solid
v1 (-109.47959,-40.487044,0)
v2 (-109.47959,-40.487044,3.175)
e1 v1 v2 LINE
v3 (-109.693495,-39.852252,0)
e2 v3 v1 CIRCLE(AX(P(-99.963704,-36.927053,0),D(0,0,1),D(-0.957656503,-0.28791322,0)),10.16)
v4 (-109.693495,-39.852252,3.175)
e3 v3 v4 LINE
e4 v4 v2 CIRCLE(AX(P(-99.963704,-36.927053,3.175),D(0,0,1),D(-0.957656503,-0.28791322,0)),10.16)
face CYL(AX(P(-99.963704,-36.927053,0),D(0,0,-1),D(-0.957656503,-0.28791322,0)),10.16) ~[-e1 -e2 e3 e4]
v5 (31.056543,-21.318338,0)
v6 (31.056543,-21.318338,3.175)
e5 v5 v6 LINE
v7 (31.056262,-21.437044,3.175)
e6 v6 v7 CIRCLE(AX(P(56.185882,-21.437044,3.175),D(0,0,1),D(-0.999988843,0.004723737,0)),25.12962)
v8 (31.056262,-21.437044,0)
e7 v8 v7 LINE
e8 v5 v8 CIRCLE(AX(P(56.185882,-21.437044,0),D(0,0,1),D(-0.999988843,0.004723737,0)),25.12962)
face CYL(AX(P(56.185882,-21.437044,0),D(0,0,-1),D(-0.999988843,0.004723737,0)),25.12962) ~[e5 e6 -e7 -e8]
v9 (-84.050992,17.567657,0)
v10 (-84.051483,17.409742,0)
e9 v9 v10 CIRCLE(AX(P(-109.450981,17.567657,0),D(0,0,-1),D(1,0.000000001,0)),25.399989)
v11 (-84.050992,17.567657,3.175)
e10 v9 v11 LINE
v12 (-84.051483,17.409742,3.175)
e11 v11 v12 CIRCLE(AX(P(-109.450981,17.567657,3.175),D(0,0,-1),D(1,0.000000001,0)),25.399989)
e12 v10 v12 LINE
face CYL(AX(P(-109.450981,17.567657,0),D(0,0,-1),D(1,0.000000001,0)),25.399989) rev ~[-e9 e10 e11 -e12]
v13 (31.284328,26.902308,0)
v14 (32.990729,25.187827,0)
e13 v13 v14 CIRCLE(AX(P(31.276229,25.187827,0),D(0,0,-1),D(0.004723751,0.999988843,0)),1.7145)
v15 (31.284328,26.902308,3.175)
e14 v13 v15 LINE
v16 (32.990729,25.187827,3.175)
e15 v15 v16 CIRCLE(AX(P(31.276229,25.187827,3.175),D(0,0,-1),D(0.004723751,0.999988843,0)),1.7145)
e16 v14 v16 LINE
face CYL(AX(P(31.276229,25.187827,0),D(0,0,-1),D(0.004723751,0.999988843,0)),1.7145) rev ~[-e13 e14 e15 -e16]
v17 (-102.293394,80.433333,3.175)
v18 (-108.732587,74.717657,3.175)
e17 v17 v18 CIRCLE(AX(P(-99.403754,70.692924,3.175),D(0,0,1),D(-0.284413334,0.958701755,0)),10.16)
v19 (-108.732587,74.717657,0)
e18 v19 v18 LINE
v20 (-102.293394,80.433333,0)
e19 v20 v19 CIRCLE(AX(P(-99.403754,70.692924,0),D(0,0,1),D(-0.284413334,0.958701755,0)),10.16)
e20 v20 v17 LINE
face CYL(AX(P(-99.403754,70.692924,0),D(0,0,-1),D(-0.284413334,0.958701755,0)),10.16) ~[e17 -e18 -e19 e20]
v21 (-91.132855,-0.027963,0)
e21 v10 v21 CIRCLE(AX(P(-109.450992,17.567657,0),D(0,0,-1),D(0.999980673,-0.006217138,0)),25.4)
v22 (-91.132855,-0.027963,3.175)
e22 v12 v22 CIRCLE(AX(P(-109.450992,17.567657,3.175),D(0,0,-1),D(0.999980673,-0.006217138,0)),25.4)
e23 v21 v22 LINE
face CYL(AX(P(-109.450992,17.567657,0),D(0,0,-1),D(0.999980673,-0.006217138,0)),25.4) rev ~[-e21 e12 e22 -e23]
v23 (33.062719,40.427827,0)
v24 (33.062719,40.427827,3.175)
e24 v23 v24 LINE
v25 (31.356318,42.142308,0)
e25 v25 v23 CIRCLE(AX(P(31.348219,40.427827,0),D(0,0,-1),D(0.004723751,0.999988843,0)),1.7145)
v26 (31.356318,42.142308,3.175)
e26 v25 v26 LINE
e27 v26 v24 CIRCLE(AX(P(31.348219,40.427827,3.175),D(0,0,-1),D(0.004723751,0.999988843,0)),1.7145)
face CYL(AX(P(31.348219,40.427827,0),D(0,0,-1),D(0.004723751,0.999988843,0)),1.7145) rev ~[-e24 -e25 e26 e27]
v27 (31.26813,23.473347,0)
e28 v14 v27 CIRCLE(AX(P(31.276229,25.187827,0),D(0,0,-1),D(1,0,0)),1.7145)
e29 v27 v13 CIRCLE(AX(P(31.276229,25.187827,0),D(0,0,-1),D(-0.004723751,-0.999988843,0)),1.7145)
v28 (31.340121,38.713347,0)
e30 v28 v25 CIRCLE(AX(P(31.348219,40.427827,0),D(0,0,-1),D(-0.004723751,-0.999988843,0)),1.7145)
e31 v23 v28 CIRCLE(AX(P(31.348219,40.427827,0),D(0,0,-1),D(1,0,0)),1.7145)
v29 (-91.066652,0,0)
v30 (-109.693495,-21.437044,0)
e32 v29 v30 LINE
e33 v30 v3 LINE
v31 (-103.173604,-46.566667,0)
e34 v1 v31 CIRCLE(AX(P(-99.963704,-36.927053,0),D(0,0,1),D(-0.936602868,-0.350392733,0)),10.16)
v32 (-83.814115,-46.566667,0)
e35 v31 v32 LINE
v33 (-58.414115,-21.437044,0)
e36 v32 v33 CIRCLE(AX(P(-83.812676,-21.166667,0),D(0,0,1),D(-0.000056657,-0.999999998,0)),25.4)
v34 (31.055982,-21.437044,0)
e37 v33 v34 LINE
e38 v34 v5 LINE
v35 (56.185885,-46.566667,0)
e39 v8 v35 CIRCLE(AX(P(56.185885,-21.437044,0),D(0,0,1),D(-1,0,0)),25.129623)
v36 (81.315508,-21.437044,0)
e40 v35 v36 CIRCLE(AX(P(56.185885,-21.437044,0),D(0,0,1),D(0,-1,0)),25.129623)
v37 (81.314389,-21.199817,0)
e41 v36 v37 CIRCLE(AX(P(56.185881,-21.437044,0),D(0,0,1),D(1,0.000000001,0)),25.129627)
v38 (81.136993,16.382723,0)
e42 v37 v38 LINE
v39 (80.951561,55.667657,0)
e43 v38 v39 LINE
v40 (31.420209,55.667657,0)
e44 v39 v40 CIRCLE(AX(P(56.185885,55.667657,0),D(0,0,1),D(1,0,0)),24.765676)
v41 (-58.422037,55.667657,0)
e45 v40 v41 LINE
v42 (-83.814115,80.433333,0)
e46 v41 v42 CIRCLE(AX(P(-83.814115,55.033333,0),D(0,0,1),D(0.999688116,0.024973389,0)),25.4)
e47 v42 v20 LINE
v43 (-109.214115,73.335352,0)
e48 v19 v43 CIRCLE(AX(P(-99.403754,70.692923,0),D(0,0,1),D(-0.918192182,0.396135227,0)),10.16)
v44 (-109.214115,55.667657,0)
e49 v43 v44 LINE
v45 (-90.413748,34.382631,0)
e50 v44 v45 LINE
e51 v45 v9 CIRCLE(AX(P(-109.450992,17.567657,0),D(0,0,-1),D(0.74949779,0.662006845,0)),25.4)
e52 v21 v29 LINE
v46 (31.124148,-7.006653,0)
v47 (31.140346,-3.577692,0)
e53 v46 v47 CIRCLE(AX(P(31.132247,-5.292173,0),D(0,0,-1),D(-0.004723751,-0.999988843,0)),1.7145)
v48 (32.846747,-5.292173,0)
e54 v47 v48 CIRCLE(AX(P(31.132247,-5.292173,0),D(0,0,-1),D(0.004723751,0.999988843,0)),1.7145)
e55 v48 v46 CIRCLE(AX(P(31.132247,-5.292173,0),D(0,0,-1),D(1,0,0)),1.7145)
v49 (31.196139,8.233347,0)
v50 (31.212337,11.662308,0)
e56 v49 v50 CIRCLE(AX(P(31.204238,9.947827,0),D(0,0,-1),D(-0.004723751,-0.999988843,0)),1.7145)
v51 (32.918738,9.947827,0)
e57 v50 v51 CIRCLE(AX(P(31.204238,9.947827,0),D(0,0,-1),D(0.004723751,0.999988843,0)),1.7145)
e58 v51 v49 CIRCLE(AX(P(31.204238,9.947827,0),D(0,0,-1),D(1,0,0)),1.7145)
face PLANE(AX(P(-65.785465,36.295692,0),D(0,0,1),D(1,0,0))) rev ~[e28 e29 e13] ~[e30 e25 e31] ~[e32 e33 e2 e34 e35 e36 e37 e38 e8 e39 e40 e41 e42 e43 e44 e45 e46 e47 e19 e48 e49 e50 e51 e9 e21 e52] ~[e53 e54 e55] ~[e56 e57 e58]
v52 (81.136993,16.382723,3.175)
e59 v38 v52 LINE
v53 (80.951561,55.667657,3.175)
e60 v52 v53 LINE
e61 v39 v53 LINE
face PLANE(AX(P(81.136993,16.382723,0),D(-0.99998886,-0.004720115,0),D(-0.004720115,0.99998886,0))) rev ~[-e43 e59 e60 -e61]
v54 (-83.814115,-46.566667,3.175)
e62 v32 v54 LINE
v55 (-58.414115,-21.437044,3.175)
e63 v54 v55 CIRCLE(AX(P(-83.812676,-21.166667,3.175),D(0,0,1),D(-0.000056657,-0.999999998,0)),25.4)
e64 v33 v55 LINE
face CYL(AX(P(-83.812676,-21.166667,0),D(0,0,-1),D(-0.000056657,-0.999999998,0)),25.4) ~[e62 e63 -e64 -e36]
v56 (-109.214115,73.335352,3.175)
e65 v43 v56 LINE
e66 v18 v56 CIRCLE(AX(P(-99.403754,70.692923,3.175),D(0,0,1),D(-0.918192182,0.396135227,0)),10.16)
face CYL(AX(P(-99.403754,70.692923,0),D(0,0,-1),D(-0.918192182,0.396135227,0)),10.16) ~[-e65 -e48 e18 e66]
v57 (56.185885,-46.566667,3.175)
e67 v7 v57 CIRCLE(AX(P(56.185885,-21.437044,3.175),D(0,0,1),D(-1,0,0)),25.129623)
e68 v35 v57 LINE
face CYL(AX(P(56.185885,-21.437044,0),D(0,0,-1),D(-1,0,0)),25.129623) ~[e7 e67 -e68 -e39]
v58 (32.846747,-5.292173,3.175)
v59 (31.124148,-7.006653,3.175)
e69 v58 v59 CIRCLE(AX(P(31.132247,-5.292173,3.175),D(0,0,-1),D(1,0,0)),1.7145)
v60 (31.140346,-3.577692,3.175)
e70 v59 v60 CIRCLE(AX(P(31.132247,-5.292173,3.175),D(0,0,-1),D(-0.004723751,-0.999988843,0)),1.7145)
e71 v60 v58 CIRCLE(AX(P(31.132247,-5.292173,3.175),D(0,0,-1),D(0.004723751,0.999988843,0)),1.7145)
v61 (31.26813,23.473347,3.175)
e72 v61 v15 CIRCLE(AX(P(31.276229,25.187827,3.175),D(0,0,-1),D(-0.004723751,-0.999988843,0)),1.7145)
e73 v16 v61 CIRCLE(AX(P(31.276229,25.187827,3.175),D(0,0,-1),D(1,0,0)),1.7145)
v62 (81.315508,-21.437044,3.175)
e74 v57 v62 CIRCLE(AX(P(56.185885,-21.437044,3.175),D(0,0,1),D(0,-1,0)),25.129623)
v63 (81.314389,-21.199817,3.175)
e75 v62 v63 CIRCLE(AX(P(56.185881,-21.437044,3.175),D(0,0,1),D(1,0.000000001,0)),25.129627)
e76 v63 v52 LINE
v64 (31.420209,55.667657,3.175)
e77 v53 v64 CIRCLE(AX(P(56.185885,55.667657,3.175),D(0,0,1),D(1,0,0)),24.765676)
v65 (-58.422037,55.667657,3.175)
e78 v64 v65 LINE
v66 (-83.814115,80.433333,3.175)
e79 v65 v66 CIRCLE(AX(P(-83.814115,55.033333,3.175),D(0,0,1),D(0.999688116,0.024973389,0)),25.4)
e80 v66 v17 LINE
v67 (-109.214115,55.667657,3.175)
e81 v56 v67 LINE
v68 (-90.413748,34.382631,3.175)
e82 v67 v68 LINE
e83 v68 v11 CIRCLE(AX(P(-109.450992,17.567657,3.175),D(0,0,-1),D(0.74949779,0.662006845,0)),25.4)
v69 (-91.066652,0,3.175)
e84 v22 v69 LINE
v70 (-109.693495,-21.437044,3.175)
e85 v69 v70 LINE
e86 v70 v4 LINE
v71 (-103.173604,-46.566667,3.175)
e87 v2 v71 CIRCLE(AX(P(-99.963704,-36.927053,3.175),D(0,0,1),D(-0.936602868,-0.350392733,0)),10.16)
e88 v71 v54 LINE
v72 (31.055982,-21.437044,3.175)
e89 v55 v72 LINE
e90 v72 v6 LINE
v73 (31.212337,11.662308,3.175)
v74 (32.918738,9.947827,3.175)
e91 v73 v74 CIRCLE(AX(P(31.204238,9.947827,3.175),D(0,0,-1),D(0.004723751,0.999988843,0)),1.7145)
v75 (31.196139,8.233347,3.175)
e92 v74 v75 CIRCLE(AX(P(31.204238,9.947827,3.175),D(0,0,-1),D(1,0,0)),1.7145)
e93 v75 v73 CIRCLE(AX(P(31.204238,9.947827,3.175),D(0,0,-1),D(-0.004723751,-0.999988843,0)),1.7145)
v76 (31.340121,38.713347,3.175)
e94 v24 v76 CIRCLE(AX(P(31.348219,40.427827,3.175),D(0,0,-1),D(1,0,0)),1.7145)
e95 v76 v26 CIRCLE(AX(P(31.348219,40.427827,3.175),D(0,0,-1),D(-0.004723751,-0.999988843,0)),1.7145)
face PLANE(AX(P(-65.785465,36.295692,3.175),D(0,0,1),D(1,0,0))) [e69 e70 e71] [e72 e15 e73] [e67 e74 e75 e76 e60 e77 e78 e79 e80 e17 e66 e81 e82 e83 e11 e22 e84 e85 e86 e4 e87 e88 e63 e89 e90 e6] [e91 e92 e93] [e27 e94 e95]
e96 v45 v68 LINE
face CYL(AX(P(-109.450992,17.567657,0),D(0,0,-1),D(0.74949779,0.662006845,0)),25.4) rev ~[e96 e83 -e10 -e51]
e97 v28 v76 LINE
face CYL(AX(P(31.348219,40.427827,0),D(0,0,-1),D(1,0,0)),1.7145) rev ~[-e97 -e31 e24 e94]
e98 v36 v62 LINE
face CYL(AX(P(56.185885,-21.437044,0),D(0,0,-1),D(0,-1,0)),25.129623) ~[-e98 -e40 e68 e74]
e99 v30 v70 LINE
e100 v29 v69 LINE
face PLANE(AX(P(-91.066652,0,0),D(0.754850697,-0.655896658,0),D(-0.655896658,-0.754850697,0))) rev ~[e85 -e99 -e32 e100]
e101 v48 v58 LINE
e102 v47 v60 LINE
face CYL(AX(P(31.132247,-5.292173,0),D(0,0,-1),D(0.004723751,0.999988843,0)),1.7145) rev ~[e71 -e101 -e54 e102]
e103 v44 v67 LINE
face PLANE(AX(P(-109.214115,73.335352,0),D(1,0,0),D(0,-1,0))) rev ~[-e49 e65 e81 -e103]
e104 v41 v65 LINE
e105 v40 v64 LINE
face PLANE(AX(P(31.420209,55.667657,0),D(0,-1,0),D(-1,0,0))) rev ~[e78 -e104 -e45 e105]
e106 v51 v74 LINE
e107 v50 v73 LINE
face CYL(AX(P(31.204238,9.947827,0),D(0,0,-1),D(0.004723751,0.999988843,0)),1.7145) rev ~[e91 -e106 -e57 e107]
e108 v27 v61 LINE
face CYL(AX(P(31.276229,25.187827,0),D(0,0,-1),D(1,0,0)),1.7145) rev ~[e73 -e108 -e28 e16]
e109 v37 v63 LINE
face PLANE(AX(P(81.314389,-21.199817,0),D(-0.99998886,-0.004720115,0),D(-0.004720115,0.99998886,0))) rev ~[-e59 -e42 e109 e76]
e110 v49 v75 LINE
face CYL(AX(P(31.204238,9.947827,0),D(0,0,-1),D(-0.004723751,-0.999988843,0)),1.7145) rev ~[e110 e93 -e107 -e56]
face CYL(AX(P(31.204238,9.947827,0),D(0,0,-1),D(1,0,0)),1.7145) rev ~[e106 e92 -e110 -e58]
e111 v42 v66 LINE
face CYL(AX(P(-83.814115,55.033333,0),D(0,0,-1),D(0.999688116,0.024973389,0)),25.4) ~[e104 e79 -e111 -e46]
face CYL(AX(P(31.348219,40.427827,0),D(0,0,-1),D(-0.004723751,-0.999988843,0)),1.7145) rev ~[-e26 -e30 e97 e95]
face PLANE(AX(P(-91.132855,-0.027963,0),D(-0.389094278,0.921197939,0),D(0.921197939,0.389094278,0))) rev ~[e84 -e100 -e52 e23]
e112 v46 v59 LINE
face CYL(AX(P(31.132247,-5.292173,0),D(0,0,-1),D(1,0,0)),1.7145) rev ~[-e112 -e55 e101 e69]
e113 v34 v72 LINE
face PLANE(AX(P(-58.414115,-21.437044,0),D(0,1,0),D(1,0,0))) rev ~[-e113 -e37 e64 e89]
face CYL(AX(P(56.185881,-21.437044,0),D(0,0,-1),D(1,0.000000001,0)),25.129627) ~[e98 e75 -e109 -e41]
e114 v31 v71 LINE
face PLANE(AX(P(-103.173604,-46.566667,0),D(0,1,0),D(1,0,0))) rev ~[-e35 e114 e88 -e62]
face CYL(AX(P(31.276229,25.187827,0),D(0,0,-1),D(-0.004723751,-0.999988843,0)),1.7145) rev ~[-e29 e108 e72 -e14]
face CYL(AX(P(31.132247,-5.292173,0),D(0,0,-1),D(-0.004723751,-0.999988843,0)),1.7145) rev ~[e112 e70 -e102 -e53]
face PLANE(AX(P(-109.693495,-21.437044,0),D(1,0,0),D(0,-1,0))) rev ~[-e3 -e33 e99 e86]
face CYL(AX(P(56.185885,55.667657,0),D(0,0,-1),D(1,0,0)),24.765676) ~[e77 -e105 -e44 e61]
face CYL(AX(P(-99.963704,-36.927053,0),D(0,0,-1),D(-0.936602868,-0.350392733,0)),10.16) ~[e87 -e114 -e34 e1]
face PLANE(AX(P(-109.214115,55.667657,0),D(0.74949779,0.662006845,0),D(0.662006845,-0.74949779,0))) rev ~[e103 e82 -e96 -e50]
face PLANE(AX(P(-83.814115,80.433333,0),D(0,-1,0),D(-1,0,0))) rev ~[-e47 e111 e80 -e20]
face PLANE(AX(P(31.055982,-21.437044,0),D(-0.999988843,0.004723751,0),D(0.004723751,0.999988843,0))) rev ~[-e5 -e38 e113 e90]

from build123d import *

# Parameters (mm, degrees)
F1_DEPTH = 3.175


# Not quite as in the source:
# - a length typed as a fraction of an inch, garbled in the dataset ("3 / 203.2 mm" for 3/8 in), is restored
# - a feature names something its author has since deleted; it is built from what else it names


with BuildPart() as f1:
    # F0 (on Top) → F1 (new body)
    with BuildSketch(Plane.XY):
        with BuildLine():
            Line((-58.4220365395, 55.6676574051), (-83.8141146934, 55.6676574051))
            Line((-83.8141146934, 55.6676574051), (-83.8141146934, 17.4082663185))
            Line((-83.8141146934, 17.4082663185), (-54.5982423949, 17.2266236973))
            ThreePointArc((-54.5982423949, 17.2266236973), (-52.878445863, 18.9304561303), (-51.1692755304, 17.2159644142))
            ThreePointArc((-51.1692755304, 17.2159644142), (-51.1692838142, 17.2106347468), (-51.1693086658, 17.205305131))
            Line((-51.1693086658, 17.205305131), (-48.1096365395, 17.1862823595))
            Line((-48.1096365395, 17.1862823595), (-48.1096365395, 55.6676574051))
            Line((-48.1096365395, 55.6676574051), (-51.9196365395, 55.6676574051))
            Line((-51.9196365395, 55.6676574051), (-58.4220365395, 55.6676574051))
        make_face()
        with BuildLine():
            Line((-83.8141146934, 80.4333333333), (-83.8141146934, 55.6676574051))
            Line((-83.8141146934, 55.6676574051), (-58.4220365395, 55.6676574051))
            ThreePointArc((-58.4220365395, 55.6676574051), (-66.0792878183, 73.2167300378), (-83.8141146934, 80.4333333333))
        make_face()
        with BuildLine():
            Line((-96.5141146934, 55.6676574051), (-83.8141146934, 55.6676574051))
            Line((-83.8141146934, 55.6676574051), (-83.8141146934, 80.4333333333))
            Line((-83.8141146934, 80.4333333333), (-96.5141146934, 80.4333333333))
            Line((-96.5141146934, 80.4333333333), (-102.2933936502, 80.4333333333))
            ThreePointArc((-102.2933936502, 80.4333333333), (-106.1483818555, 78.2913178986), (-108.7325867358, 74.7176574051))
            Line((-108.7325867358, 74.7176574051), (-102.8641146934, 74.7176574051))
            Line((-102.8641146934, 74.7176574051), (-99.6891146934, 74.7176574051))
            Line((-99.6891146934, 74.7176574051), (-99.6891146934, 55.6676574051))
            Line((-99.6891146934, 55.6676574051), (-96.5141146934, 55.6676574051))
        make_face()
        with BuildLine():
            Line((-83.8141146934, 17.4082663185), (-83.8141146934, 55.6676574051))
            Line((-83.8141146934, 55.6676574051), (-96.5141146934, 55.6676574051))
            Line((-96.5141146934, 55.6676574051), (-99.6891146934, 55.6676574051))
            Line((-99.6891146934, 55.6676574051), (-102.8641146934, 55.6676574051))
            Line((-102.8641146934, 55.6676574051), (-109.2141146934, 55.6676574051))
            Line((-109.2141146934, 55.6676574051), (-90.4137483739, 34.3826312783))
            ThreePointArc((-90.4137483739, 34.3826312783), (-85.6948772916, 26.5569289565), (-84.0509922302, 17.5676574051))
            ThreePointArc((-84.0509922302, 17.5676574051), (-84.0511149543, 17.4886993707), (-84.0514831256, 17.4097420993))
            Line((-84.0514831256, 17.4097420993), (-83.8141146934, 17.4082663185))
        make_face()
        with BuildLine():
            Line((-54.5982423949, 17.2266236973), (-83.8141146934, 17.4082663185))
            Line((-83.8141146934, 17.4082663185), (-83.8141146934, -21.4370436153))
            Line((-83.8141146934, -21.4370436153), (-58.4141146934, -21.4370436153))
            Line((-58.4141146934, -21.4370436153), (-48.1096365395, -21.4370436153))
            Line((-48.1096365395, -21.4370436153), (-48.1096365395, 17.1862823595))
            Line((-48.1096365395, 17.1862823595), (-51.1693086658, 17.205305131))
            ThreePointArc((-51.1693086658, 17.205305131), (-52.8944348135, 15.5014975496), (-54.5982423949, 17.2266236973))
        make_face()
        with BuildLine():
            Line((-83.8141146934, -21.4370436153), (-83.8141146934, 17.4082663185))
            Line((-83.8141146934, 17.4082663185), (-84.0514831256, 17.4097420993))
            ThreePointArc((-84.0514831256, 17.4097420993), (-85.9174728188, 8.0108031049), (-91.1328551507, -0.0279629004))
            Line((-91.1328551507, -0.0279629004), (-91.0666517454, 0))
            Line((-91.0666517454, 0), (-109.6934945268, -21.4370436153))
            Line((-109.6934945268, -21.4370436153), (-103.5974945268, -21.4370436153))
            Line((-103.5974945268, -21.4370436153), (-100.1684945268, -21.4370436153))
            Line((-100.1684945268, -21.4370436153), (-83.8141146934, -21.4370436153))
        make_face()
        with BuildLine():
            Line((-58.4141146934, -21.4370436153), (-83.8141146934, -21.4370436153))
            Line((-83.8141146934, -21.4370436153), (-83.8141146934, -46.5666666667))
            ThreePointArc((-83.8141146934, -46.5666666667), (-65.9485232906, -39.2230246493), (-58.4141146934, -21.4370436153))
        make_face()
        with BuildLine():
            Line((-83.8141146934, -46.5666666667), (-83.8141146934, -21.4370436153))
            Line((-83.8141146934, -21.4370436153), (-100.1684945268, -21.4370436153))
            Line((-100.1684945268, -21.4370436153), (-100.1684945268, -40.4870436153))
            Line((-100.1684945268, -40.4870436153), (-103.5974945268, -40.4870436153))
            Line((-103.5974945268, -40.4870436153), (-109.4795895949, -40.4870436153))
            ThreePointArc((-109.4795895949, -40.4870436153), (-107.0154315461, -44.2413370786), (-103.1736042979, -46.5666666667))
            Line((-103.1736042979, -46.5666666667), (-96.7538046101, -46.5666666667))
            Line((-96.7538046101, -46.5666666667), (-83.8141146934, -46.5666666667))
        make_face()
        with BuildLine():
            ThreePointArc((-51.1692755304, 17.2159644142), (-52.878445863, 18.9304561303), (-54.5982423949, 17.2266236973))
            Line((-54.5982423949, 17.2266236973), (-51.1693086658, 17.205305131))
            ThreePointArc((-51.1693086658, 17.205305131), (-51.1692838142, 17.2106347468), (-51.1692755304, 17.2159644142))
        make_face()
        with BuildLine():
            Line((-51.1693086658, 17.205305131), (-54.5982423949, 17.2266236973))
            ThreePointArc((-54.5982423949, 17.2266236973), (-52.8944348135, 15.5014975496), (-51.1693086658, 17.205305131))
        make_face()
        with BuildLine():
            Line((56.1858853066, 55.6676574051), (56.1858853066, 80.4333333333))
            ThreePointArc((56.1858853066, 80.4333333333), (38.6739079171, 73.1796347946), (31.4202093784, 55.6676574051))
            Line((31.4202093784, 55.6676574051), (56.1858853066, 55.6676574051))
        make_face()
        with BuildLine():
            ThreePointArc((80.9515612348, 55.6676574051), (73.6978626961, 73.1796347946), (56.1858853066, 80.4333333333))
            Line((56.1858853066, 80.4333333333), (56.1858853066, 55.6676574051))
            Line((56.1858853066, 55.6676574051), (80.9515612348, 55.6676574051))
        make_face()
        with BuildLine():
            Line((-102.8641146934, 55.6676574051), (-99.6891146934, 55.6676574051))
            Line((-99.6891146934, 55.6676574051), (-99.6891146934, 74.7176574051))
            Line((-99.6891146934, 74.7176574051), (-102.8641146934, 74.7176574051))
            Line((-102.8641146934, 74.7176574051), (-102.8641146934, 71.6696574051))
            ThreePointArc((-102.8641146934, 71.6696574051), (-101.651780117, 71.1674919815), (-101.1496146934, 69.9551574051))
            ThreePointArc((-101.1496146934, 69.9551574051), (-101.651780117, 68.7428228288), (-102.8641146934, 68.2406574051))
            Line((-102.8641146934, 68.2406574051), (-102.8641146934, 62.1446574051))
            ThreePointArc((-102.8641146934, 62.1446574051), (-101.651780117, 61.6424919815), (-101.1496146934, 60.4301574051))
            ThreePointArc((-101.1496146934, 60.4301574051), (-101.651780117, 59.2178228288), (-102.8641146934, 58.7156574051))
            Line((-102.8641146934, 58.7156574051), (-102.8641146934, 55.6676574051))
        make_face()
        with BuildLine():
            Line((-100.1684945268, -40.4870436153), (-100.1684945268, -21.4370436153))
            Line((-100.1684945268, -21.4370436153), (-103.5974945268, -21.4370436153))
            Line((-103.5974945268, -21.4370436153), (-103.5974945268, -25.4485957723))
            ThreePointArc((-103.5974945268, -25.4485957723), (-102.3851599505, -25.9507611959), (-101.8829945268, -27.1630957723))
            ThreePointArc((-101.8829945268, -27.1630957723), (-102.3851599505, -28.3754303486), (-103.5974945268, -28.8775957723))
            Line((-103.5974945268, -28.8775957723), (-103.5974945268, -32.9818256598))
            ThreePointArc((-103.5974945268, -32.9818256598), (-102.3851599505, -33.4839910834), (-101.8829945268, -34.6963256598))
            ThreePointArc((-101.8829945268, -34.6963256598), (-102.3851599505, -35.9086602361), (-103.5974945268, -36.4108256598))
            Line((-103.5974945268, -36.4108256598), (-103.5974945268, -40.4870436153))
            Line((-103.5974945268, -40.4870436153), (-100.1684945268, -40.4870436153))
        make_face()
        Polygon((-39.2196365395, 55.6676574051), (-48.1096365395, 55.6676574051), (-48.1096365395, 17.1862823595), (-39.2196365395, 17.1310109342), align=None)
        with BuildLine():
            Line((81.1369927167, 16.382722696), (80.9515612348, 55.6676574051))
            ThreePointArc((80.9515612348, 55.6676574051), (73.6978626961, 38.1556800156), (56.1858853066, 30.9019814769))
            Line((56.1858853066, 30.9019814769), (56.1858853066, 26.6474814769))
            ThreePointArc((56.1858853066, 26.6474814769), (57.398219883, 26.1453160533), (57.9003853066, 24.9329814769))
            ThreePointArc((57.9003853066, 24.9329814769), (57.398219883, 23.7206469006), (56.1858853066, 23.2184814769))
            Line((56.1858853066, 23.2184814769), (56.1858853066, 16.5378501727))
            Line((56.1858853066, 16.5378501727), (81.1369927167, 16.382722696))
        make_face()
        with BuildLine():
            ThreePointArc((56.1858853066, 30.9019814769), (73.6978626961, 38.1556800156), (80.9515612348, 55.6676574051))
            Line((80.9515612348, 55.6676574051), (56.1858853066, 55.6676574051))
            Line((56.1858853066, 55.6676574051), (56.1858853066, 30.9019814769))
        make_face()
        with BuildLine():
            Line((31.35631828, 42.1423083088), (31.4202093784, 55.6676574051))
            Line((31.4202093784, 55.6676574051), (24.2803634605, 55.6676574051))
            Line((24.2803634605, 55.6676574051), (20.4703634605, 55.6676574051))
            Line((20.4703634605, 55.6676574051), (20.4703634605, 16.7599027932))
            Line((20.4703634605, 16.7599027932), (23.5155513145, 16.7409700741))
            ThreePointArc((23.5155513145, 16.7409700741), (25.2353478464, 18.4448025071), (26.944518179, 16.730310791))
            ThreePointArc((26.944518179, 16.730310791), (26.9445098952, 16.7249811236), (26.9444850436, 16.7196515078))
            Line((26.9444850436, 16.7196515078), (31.2361005906, 16.6929694259))
            Line((31.2361005906, 16.6929694259), (31.2681297634, 23.4733465661))
            ThreePointArc((31.2681297634, 23.4733465661), (29.5617477636, 25.1959263091), (31.2843275066, 26.9023083088))
            Line((31.2843275066, 26.9023083088), (31.3401205367, 38.7133465661))
            ThreePointArc((31.3401205367, 38.7133465661), (29.633738537, 40.4359263091), (31.35631828, 42.1423083088))
        make_face()
        with BuildLine():
            Line((56.1858853066, 55.6676574051), (31.4202093784, 55.6676574051))
            ThreePointArc((31.4202093784, 55.6676574051), (38.6739079171, 38.1556800156), (56.1858853066, 30.9019814769))
            Line((56.1858853066, 30.9019814769), (56.1858853066, 55.6676574051))
        make_face()
        with BuildLine():
            ThreePointArc((56.1858853066, 30.9019814769), (38.6739079171, 38.1556800156), (31.4202093784, 55.6676574051))
            Line((31.4202093784, 55.6676574051), (31.35631828, 42.1423083088))
            ThreePointArc((31.35631828, 42.1423083088), (32.5634139947, 41.6372952408), (33.0627194083, 40.4278274374))
            ThreePointArc((33.0627194083, 40.4278274374), (32.5576872116, 39.2126328511), (31.3401205367, 38.7133465661))
            Line((31.3401205367, 38.7133465661), (31.2843275066, 26.9023083088))
            ThreePointArc((31.2843275066, 26.9023083088), (32.4914232214, 26.3972952408), (32.990728635, 25.1878274374))
            ThreePointArc((32.990728635, 25.1878274374), (32.4856964383, 23.9726328511), (31.2681297634, 23.4733465661))
            Line((31.2681297634, 23.4733465661), (31.2361005906, 16.6929694259))
            Line((31.2361005906, 16.6929694259), (56.1858853066, 16.5378501727))
            Line((56.1858853066, 16.5378501727), (56.1858853066, 23.2184814769))
            ThreePointArc((56.1858853066, 23.2184814769), (54.4713853066, 24.9329814769), (56.1858853066, 26.6474814769))
            Line((56.1858853066, 26.6474814769), (56.1858853066, 30.9019814769))
        make_face()
        with BuildLine():
            Line((-109.2141146934, 55.6676574051), (-102.8641146934, 55.6676574051))
            Line((-102.8641146934, 55.6676574051), (-102.8641146934, 58.7156574051))
            ThreePointArc((-102.8641146934, 58.7156574051), (-104.5786146934, 60.4301574051), (-102.8641146934, 62.1446574051))
            Line((-102.8641146934, 62.1446574051), (-102.8641146934, 68.2406574051))
            ThreePointArc((-102.8641146934, 68.2406574051), (-104.5786146934, 69.9551574051), (-102.8641146934, 71.6696574051))
            Line((-102.8641146934, 71.6696574051), (-102.8641146934, 74.7176574051))
            Line((-102.8641146934, 74.7176574051), (-108.7325867358, 74.7176574051))
            ThreePointArc((-108.7325867358, 74.7176574051), (-108.9982771043, 74.0351876591), (-109.2141146934, 73.3353516345))
            Line((-109.2141146934, 73.3353516345), (-109.2141146934, 68.0504953692))
            Line((-109.2141146934, 68.0504953692), (-109.2141146934, 55.6676574051))
        make_face()
        Polygon((-48.1096365395, 17.1862823595), (-48.1096365395, -21.4370436153), (-39.2196365395, -21.4370436153), (-39.2196365395, 17.1310109342), align=None)
        with BuildLine():
            Line((-103.5974945268, -25.4485957723), (-103.5974945268, -21.4370436153))
            Line((-103.5974945268, -21.4370436153), (-109.6934945268, -21.4370436153))
            Line((-109.6934945268, -21.4370436153), (-109.6934945268, -34.001855141))
            Line((-109.6934945268, -34.001855141), (-109.6934945268, -39.8522517564))
            ThreePointArc((-109.6934945268, -39.8522517564), (-109.5917750698, -40.1714110456), (-109.4795895949, -40.4870436153))
            Line((-109.4795895949, -40.4870436153), (-103.5974945268, -40.4870436153))
            Line((-103.5974945268, -40.4870436153), (-103.5974945268, -36.4108256598))
            ThreePointArc((-103.5974945268, -36.4108256598), (-105.3119945268, -34.6963256598), (-103.5974945268, -32.9818256598))
            Line((-103.5974945268, -32.9818256598), (-103.5974945268, -28.8775957723))
            ThreePointArc((-103.5974945268, -28.8775957723), (-105.3119945268, -27.1630957723), (-103.5974945268, -25.4485957723))
        make_face()
        with BuildLine():
            Line((11.5803634605, 55.6676574051), (-39.2196365395, 55.6676574051))
            Line((-39.2196365395, 55.6676574051), (-39.2196365395, 17.1310109342))
            Line((-39.2196365395, 17.1310109342), (-36.1589034041, 17.1119815661))
            ThreePointArc((-36.1589034041, 17.1119815661), (-34.4391068722, 18.815813999), (-32.7299365395, 17.1013222829))
            ThreePointArc((-32.7299365395, 17.1013222829), (-32.7299448234, 17.0959926156), (-32.729969675, 17.0906629998))
            Line((-32.729969675, 17.0906629998), (5.0906965959, 16.8555221529))
            ThreePointArc((5.0906965959, 16.8555221529), (6.8104931278, 18.5593545859), (8.5196634605, 16.8448628697))
            ThreePointArc((8.5196634605, 16.8448628697), (8.5196551766, 16.8395332024), (8.519630325, 16.8342035866))
            Line((8.519630325, 16.8342035866), (11.5803634605, 16.8151742185))
            Line((11.5803634605, 16.8151742185), (11.5803634605, 55.6676574051))
        make_face()
        with BuildLine():
            Line((81.3143886077, -21.1998168282), (81.1369927167, 16.382722696))
            Line((81.1369927167, 16.382722696), (56.1858853066, 16.5378501727))
            Line((56.1858853066, 16.5378501727), (56.1858853066, 13.1854814769))
            ThreePointArc((56.1858853066, 13.1854814769), (57.398219883, 12.6833160533), (57.9003853066, 11.4709814769))
            ThreePointArc((57.9003853066, 11.4709814769), (57.398219883, 10.2586469006), (56.1858853066, 9.7564814769))
            Line((56.1858853066, 9.7564814769), (56.1858853066, 3.692579436))
            ThreePointArc((56.1858853066, 3.692579436), (73.8711409588, -3.5840414247), (81.3143886077, -21.1998168282))
        make_face()
        with BuildLine():
            ThreePointArc((-102.8641146934, 62.1446574051), (-104.5786146934, 60.4301574051), (-102.8641146934, 58.7156574051))
            Line((-102.8641146934, 58.7156574051), (-102.8641146934, 62.1446574051))
        make_face()
        with BuildLine():
            Line((-102.8641146934, 62.1446574051), (-102.8641146934, 58.7156574051))
            ThreePointArc((-102.8641146934, 58.7156574051), (-101.651780117, 59.2178228288), (-101.1496146934, 60.4301574051))
            ThreePointArc((-101.1496146934, 60.4301574051), (-101.651780117, 61.6424919815), (-102.8641146934, 62.1446574051))
        make_face()
        with BuildLine():
            Line((-39.2196365395, 17.1310109342), (-39.2196365395, -21.4370436153))
            Line((-39.2196365395, -21.4370436153), (11.5803634605, -21.4370436153))
            Line((11.5803634605, -21.4370436153), (11.5803634605, 16.8151742185))
            Line((11.5803634605, 16.8151742185), (8.519630325, 16.8342035866))
            ThreePointArc((8.519630325, 16.8342035866), (6.7945041773, 15.1303960052), (5.0906965959, 16.8555221529))
            Line((5.0906965959, 16.8555221529), (-32.729969675, 17.0906629998))
            ThreePointArc((-32.729969675, 17.0906629998), (-34.4550958227, 15.3868554184), (-36.1589034041, 17.1119815661))
            Line((-36.1589034041, 17.1119815661), (-39.2196365395, 17.1310109342))
        make_face()
        with BuildLine():
            Line((56.1858853066, -21.4370436153), (56.1858853066, -46.5666666667))
            ThreePointArc((56.1858853066, -46.5666666667), (73.9552121749, -39.2063704836), (81.315508358, -21.4370436153))
            Line((81.315508358, -21.4370436153), (56.1858853066, -21.4370436153))
        make_face()
        with BuildLine():
            ThreePointArc((31.0562622553, -21.4370436153), (38.4165584384, -39.2063704836), (56.1858853066, -46.5666666667))
            Line((56.1858853066, -46.5666666667), (56.1858853066, -21.4370436153))
            Line((56.1858853066, -21.4370436153), (31.0562622553, -21.4370436153))
        make_face()
        with BuildLine():
            ThreePointArc((-101.8829945268, -27.1630957723), (-102.3851599505, -25.9507611959), (-103.5974945268, -25.4485957723))
            Line((-103.5974945268, -25.4485957723), (-103.5974945268, -28.8775957723))
            ThreePointArc((-103.5974945268, -28.8775957723), (-102.3851599505, -28.3754303486), (-101.8829945268, -27.1630957723))
        make_face()
        with BuildLine():
            Line((-103.5974945268, -28.8775957723), (-103.5974945268, -25.4485957723))
            ThreePointArc((-103.5974945268, -25.4485957723), (-105.3119945268, -27.1630957723), (-103.5974945268, -28.8775957723))
        make_face()
        Polygon((20.4703634605, 55.6676574051), (11.5803634605, 55.6676574051), (11.5803634605, 16.8151742185), (20.4703634605, 16.7599027932), align=None)
        with BuildLine():
            ThreePointArc((57.9003853066, 24.9329814769), (57.398219883, 26.1453160533), (56.1858853066, 26.6474814769))
            Line((56.1858853066, 26.6474814769), (56.1858853066, 23.2184814769))
            ThreePointArc((56.1858853066, 23.2184814769), (57.398219883, 23.7206469006), (57.9003853066, 24.9329814769))
        make_face()
        with BuildLine():
            Line((56.1858853066, 23.2184814769), (56.1858853066, 26.6474814769))
            ThreePointArc((56.1858853066, 26.6474814769), (54.4713853066, 24.9329814769), (56.1858853066, 23.2184814769))
        make_face()
        with BuildLine():
            Line((81.315508358, -21.4370436153), (81.3143886077, -21.1998168282))
            ThreePointArc((81.3143886077, -21.1998168282), (73.8711409588, -3.5840414247), (56.1858853066, 3.692579436))
            Line((56.1858853066, 3.692579436), (56.1858853066, -21.4370436153))
            Line((56.1858853066, -21.4370436153), (81.315508358, -21.4370436153))
        make_face()
        with BuildLine():
            ThreePointArc((81.315508358, -21.4370436153), (81.3152284188, -21.3184289004), (81.3143886077, -21.1998168282))
            Line((81.3143886077, -21.1998168282), (81.315508358, -21.4370436153))
        make_face()
        with BuildLine():
            Line((56.1858853066, 13.1854814769), (56.1858853066, 16.5378501727))
            Line((56.1858853066, 16.5378501727), (31.2361005906, 16.6929694259))
            Line((31.2361005906, 16.6929694259), (31.2123367333, 11.6623083088))
            ThreePointArc((31.2123367333, 11.6623083088), (32.4194324481, 11.1572952408), (32.9187378617, 9.9478274374))
            ThreePointArc((32.9187378617, 9.9478274374), (32.413705665, 8.7326328511), (31.1961389901, 8.2333465661))
            Line((31.1961389901, 8.2333465661), (31.14034596, -3.5776916912))
            ThreePointArc((31.14034596, -3.5776916912), (32.3474416748, -4.0827047592), (32.8467470884, -5.2921725626))
            ThreePointArc((32.8467470884, -5.2921725626), (32.3417148917, -6.5073671489), (31.1241482168, -7.0066534339))
            Line((31.1241482168, -7.0066534339), (31.0565426242, -21.3183378707))
            ThreePointArc((31.0565426242, -21.3183378707), (38.4585769367, -3.6257973743), (56.1858853066, 3.692579436))
            Line((56.1858853066, 3.692579436), (56.1858853066, 9.7564814769))
            ThreePointArc((56.1858853066, 9.7564814769), (54.4713853066, 11.4709814769), (56.1858853066, 13.1854814769))
        make_face()
        with BuildLine():
            ThreePointArc((-101.1496146934, 69.9551574051), (-101.651780117, 71.1674919815), (-102.8641146934, 71.6696574051))
            Line((-102.8641146934, 71.6696574051), (-102.8641146934, 68.2406574051))
            ThreePointArc((-102.8641146934, 68.2406574051), (-101.651780117, 68.7428228288), (-101.1496146934, 69.9551574051))
        make_face()
        with BuildLine():
            Line((-102.8641146934, 68.2406574051), (-102.8641146934, 71.6696574051))
            ThreePointArc((-102.8641146934, 71.6696574051), (-104.5786146934, 69.9551574051), (-102.8641146934, 68.2406574051))
        make_face()
        Polygon((11.5803634605, 16.8151742185), (11.5803634605, -21.4370436153), (20.4703634605, -21.4370436153), (20.4703634605, 16.7599027932), align=None)
        with BuildLine():
            ThreePointArc((31.0565426242, -21.3183378707), (31.0563323476, -21.3776905775), (31.0562622553, -21.4370436153))
            Line((31.0562622553, -21.4370436153), (56.1858853066, -21.4370436153))
            Line((56.1858853066, -21.4370436153), (56.1858853066, 3.692579436))
            ThreePointArc((56.1858853066, 3.692579436), (38.4585769367, -3.6257973743), (31.0565426242, -21.3183378707))
        make_face()
        with BuildLine():
            ThreePointArc((-103.5974945268, -32.9818256598), (-105.3119945268, -34.6963256598), (-103.5974945268, -36.4108256598))
            Line((-103.5974945268, -36.4108256598), (-103.5974945268, -32.9818256598))
        make_face()
        with BuildLine():
            Line((-103.5974945268, -32.9818256598), (-103.5974945268, -36.4108256598))
            ThreePointArc((-103.5974945268, -36.4108256598), (-102.3851599505, -35.9086602361), (-101.8829945268, -34.6963256598))
            ThreePointArc((-101.8829945268, -34.6963256598), (-102.3851599505, -33.4839910834), (-103.5974945268, -32.9818256598))
        make_face()
        with BuildLine():
            ThreePointArc((-32.7299365395, 17.1013222829), (-34.4391068722, 18.815813999), (-36.1589034041, 17.1119815661))
            Line((-36.1589034041, 17.1119815661), (-32.729969675, 17.0906629998))
            ThreePointArc((-32.729969675, 17.0906629998), (-32.7299448234, 17.0959926156), (-32.7299365395, 17.1013222829))
        make_face()
        with BuildLine():
            Line((-32.729969675, 17.0906629998), (-36.1589034041, 17.1119815661))
            ThreePointArc((-36.1589034041, 17.1119815661), (-34.4550958227, 15.3868554184), (-32.729969675, 17.0906629998))
        make_face()
        with BuildLine():
            ThreePointArc((57.9003853066, 11.4709814769), (57.398219883, 12.6833160533), (56.1858853066, 13.1854814769))
            Line((56.1858853066, 13.1854814769), (56.1858853066, 9.7564814769))
            ThreePointArc((56.1858853066, 9.7564814769), (57.398219883, 10.2586469006), (57.9003853066, 11.4709814769))
        make_face()
        with BuildLine():
            Line((56.1858853066, 9.7564814769), (56.1858853066, 13.1854814769))
            ThreePointArc((56.1858853066, 13.1854814769), (54.4713853066, 11.4709814769), (56.1858853066, 9.7564814769))
        make_face()
        with BuildLine():
            Line((31.2123367333, 11.6623083088), (31.2361005906, 16.6929694259))
            Line((31.2361005906, 16.6929694259), (26.9444850436, 16.7196515078))
            ThreePointArc((26.9444850436, 16.7196515078), (25.2193588959, 15.0158439264), (23.5155513145, 16.7409700741))
            Line((23.5155513145, 16.7409700741), (20.4703634605, 16.7599027932))
            Line((20.4703634605, 16.7599027932), (20.4703634605, -21.4370436153))
            Line((20.4703634605, -21.4370436153), (31.0559818816, -21.4370436153))
            Line((31.0559818816, -21.4370436153), (31.0565426242, -21.3183378707))
            Line((31.0565426242, -21.3183378707), (31.1241482168, -7.0066534339))
            ThreePointArc((31.1241482168, -7.0066534339), (29.417766217, -5.2840736909), (31.14034596, -3.5776916912))
            Line((31.14034596, -3.5776916912), (31.1961389901, 8.2333465661))
            ThreePointArc((31.1961389901, 8.2333465661), (29.4897569903, 9.9559263091), (31.2123367333, 11.6623083088))
        make_face()
        with BuildLine():
            ThreePointArc((5.0906965959, 16.8555221529), (6.7945041773, 15.1303960052), (8.519630325, 16.8342035866))
            Line((8.519630325, 16.8342035866), (5.0906965959, 16.8555221529))
        make_face()
        with BuildLine():
            Line((5.0906965959, 16.8555221529), (8.519630325, 16.8342035866))
            ThreePointArc((8.519630325, 16.8342035866), (8.5196551766, 16.8395332024), (8.5196634605, 16.8448628697))
            ThreePointArc((8.5196634605, 16.8448628697), (6.8104931278, 18.5593545859), (5.0906965959, 16.8555221529))
        make_face()
        with BuildLine():
            ThreePointArc((23.5155513145, 16.7409700741), (25.2193588959, 15.0158439264), (26.9444850436, 16.7196515078))
            Line((26.9444850436, 16.7196515078), (23.5155513145, 16.7409700741))
        make_face()
        with BuildLine():
            Line((23.5155513145, 16.7409700741), (26.9444850436, 16.7196515078))
            ThreePointArc((26.9444850436, 16.7196515078), (26.9445098952, 16.7249811236), (26.944518179, 16.730310791))
            ThreePointArc((26.944518179, 16.730310791), (25.2353478464, 18.4448025071), (23.5155513145, 16.7409700741))
        make_face()
    extrude(amount=F1_DEPTH)


solid = f1.part
